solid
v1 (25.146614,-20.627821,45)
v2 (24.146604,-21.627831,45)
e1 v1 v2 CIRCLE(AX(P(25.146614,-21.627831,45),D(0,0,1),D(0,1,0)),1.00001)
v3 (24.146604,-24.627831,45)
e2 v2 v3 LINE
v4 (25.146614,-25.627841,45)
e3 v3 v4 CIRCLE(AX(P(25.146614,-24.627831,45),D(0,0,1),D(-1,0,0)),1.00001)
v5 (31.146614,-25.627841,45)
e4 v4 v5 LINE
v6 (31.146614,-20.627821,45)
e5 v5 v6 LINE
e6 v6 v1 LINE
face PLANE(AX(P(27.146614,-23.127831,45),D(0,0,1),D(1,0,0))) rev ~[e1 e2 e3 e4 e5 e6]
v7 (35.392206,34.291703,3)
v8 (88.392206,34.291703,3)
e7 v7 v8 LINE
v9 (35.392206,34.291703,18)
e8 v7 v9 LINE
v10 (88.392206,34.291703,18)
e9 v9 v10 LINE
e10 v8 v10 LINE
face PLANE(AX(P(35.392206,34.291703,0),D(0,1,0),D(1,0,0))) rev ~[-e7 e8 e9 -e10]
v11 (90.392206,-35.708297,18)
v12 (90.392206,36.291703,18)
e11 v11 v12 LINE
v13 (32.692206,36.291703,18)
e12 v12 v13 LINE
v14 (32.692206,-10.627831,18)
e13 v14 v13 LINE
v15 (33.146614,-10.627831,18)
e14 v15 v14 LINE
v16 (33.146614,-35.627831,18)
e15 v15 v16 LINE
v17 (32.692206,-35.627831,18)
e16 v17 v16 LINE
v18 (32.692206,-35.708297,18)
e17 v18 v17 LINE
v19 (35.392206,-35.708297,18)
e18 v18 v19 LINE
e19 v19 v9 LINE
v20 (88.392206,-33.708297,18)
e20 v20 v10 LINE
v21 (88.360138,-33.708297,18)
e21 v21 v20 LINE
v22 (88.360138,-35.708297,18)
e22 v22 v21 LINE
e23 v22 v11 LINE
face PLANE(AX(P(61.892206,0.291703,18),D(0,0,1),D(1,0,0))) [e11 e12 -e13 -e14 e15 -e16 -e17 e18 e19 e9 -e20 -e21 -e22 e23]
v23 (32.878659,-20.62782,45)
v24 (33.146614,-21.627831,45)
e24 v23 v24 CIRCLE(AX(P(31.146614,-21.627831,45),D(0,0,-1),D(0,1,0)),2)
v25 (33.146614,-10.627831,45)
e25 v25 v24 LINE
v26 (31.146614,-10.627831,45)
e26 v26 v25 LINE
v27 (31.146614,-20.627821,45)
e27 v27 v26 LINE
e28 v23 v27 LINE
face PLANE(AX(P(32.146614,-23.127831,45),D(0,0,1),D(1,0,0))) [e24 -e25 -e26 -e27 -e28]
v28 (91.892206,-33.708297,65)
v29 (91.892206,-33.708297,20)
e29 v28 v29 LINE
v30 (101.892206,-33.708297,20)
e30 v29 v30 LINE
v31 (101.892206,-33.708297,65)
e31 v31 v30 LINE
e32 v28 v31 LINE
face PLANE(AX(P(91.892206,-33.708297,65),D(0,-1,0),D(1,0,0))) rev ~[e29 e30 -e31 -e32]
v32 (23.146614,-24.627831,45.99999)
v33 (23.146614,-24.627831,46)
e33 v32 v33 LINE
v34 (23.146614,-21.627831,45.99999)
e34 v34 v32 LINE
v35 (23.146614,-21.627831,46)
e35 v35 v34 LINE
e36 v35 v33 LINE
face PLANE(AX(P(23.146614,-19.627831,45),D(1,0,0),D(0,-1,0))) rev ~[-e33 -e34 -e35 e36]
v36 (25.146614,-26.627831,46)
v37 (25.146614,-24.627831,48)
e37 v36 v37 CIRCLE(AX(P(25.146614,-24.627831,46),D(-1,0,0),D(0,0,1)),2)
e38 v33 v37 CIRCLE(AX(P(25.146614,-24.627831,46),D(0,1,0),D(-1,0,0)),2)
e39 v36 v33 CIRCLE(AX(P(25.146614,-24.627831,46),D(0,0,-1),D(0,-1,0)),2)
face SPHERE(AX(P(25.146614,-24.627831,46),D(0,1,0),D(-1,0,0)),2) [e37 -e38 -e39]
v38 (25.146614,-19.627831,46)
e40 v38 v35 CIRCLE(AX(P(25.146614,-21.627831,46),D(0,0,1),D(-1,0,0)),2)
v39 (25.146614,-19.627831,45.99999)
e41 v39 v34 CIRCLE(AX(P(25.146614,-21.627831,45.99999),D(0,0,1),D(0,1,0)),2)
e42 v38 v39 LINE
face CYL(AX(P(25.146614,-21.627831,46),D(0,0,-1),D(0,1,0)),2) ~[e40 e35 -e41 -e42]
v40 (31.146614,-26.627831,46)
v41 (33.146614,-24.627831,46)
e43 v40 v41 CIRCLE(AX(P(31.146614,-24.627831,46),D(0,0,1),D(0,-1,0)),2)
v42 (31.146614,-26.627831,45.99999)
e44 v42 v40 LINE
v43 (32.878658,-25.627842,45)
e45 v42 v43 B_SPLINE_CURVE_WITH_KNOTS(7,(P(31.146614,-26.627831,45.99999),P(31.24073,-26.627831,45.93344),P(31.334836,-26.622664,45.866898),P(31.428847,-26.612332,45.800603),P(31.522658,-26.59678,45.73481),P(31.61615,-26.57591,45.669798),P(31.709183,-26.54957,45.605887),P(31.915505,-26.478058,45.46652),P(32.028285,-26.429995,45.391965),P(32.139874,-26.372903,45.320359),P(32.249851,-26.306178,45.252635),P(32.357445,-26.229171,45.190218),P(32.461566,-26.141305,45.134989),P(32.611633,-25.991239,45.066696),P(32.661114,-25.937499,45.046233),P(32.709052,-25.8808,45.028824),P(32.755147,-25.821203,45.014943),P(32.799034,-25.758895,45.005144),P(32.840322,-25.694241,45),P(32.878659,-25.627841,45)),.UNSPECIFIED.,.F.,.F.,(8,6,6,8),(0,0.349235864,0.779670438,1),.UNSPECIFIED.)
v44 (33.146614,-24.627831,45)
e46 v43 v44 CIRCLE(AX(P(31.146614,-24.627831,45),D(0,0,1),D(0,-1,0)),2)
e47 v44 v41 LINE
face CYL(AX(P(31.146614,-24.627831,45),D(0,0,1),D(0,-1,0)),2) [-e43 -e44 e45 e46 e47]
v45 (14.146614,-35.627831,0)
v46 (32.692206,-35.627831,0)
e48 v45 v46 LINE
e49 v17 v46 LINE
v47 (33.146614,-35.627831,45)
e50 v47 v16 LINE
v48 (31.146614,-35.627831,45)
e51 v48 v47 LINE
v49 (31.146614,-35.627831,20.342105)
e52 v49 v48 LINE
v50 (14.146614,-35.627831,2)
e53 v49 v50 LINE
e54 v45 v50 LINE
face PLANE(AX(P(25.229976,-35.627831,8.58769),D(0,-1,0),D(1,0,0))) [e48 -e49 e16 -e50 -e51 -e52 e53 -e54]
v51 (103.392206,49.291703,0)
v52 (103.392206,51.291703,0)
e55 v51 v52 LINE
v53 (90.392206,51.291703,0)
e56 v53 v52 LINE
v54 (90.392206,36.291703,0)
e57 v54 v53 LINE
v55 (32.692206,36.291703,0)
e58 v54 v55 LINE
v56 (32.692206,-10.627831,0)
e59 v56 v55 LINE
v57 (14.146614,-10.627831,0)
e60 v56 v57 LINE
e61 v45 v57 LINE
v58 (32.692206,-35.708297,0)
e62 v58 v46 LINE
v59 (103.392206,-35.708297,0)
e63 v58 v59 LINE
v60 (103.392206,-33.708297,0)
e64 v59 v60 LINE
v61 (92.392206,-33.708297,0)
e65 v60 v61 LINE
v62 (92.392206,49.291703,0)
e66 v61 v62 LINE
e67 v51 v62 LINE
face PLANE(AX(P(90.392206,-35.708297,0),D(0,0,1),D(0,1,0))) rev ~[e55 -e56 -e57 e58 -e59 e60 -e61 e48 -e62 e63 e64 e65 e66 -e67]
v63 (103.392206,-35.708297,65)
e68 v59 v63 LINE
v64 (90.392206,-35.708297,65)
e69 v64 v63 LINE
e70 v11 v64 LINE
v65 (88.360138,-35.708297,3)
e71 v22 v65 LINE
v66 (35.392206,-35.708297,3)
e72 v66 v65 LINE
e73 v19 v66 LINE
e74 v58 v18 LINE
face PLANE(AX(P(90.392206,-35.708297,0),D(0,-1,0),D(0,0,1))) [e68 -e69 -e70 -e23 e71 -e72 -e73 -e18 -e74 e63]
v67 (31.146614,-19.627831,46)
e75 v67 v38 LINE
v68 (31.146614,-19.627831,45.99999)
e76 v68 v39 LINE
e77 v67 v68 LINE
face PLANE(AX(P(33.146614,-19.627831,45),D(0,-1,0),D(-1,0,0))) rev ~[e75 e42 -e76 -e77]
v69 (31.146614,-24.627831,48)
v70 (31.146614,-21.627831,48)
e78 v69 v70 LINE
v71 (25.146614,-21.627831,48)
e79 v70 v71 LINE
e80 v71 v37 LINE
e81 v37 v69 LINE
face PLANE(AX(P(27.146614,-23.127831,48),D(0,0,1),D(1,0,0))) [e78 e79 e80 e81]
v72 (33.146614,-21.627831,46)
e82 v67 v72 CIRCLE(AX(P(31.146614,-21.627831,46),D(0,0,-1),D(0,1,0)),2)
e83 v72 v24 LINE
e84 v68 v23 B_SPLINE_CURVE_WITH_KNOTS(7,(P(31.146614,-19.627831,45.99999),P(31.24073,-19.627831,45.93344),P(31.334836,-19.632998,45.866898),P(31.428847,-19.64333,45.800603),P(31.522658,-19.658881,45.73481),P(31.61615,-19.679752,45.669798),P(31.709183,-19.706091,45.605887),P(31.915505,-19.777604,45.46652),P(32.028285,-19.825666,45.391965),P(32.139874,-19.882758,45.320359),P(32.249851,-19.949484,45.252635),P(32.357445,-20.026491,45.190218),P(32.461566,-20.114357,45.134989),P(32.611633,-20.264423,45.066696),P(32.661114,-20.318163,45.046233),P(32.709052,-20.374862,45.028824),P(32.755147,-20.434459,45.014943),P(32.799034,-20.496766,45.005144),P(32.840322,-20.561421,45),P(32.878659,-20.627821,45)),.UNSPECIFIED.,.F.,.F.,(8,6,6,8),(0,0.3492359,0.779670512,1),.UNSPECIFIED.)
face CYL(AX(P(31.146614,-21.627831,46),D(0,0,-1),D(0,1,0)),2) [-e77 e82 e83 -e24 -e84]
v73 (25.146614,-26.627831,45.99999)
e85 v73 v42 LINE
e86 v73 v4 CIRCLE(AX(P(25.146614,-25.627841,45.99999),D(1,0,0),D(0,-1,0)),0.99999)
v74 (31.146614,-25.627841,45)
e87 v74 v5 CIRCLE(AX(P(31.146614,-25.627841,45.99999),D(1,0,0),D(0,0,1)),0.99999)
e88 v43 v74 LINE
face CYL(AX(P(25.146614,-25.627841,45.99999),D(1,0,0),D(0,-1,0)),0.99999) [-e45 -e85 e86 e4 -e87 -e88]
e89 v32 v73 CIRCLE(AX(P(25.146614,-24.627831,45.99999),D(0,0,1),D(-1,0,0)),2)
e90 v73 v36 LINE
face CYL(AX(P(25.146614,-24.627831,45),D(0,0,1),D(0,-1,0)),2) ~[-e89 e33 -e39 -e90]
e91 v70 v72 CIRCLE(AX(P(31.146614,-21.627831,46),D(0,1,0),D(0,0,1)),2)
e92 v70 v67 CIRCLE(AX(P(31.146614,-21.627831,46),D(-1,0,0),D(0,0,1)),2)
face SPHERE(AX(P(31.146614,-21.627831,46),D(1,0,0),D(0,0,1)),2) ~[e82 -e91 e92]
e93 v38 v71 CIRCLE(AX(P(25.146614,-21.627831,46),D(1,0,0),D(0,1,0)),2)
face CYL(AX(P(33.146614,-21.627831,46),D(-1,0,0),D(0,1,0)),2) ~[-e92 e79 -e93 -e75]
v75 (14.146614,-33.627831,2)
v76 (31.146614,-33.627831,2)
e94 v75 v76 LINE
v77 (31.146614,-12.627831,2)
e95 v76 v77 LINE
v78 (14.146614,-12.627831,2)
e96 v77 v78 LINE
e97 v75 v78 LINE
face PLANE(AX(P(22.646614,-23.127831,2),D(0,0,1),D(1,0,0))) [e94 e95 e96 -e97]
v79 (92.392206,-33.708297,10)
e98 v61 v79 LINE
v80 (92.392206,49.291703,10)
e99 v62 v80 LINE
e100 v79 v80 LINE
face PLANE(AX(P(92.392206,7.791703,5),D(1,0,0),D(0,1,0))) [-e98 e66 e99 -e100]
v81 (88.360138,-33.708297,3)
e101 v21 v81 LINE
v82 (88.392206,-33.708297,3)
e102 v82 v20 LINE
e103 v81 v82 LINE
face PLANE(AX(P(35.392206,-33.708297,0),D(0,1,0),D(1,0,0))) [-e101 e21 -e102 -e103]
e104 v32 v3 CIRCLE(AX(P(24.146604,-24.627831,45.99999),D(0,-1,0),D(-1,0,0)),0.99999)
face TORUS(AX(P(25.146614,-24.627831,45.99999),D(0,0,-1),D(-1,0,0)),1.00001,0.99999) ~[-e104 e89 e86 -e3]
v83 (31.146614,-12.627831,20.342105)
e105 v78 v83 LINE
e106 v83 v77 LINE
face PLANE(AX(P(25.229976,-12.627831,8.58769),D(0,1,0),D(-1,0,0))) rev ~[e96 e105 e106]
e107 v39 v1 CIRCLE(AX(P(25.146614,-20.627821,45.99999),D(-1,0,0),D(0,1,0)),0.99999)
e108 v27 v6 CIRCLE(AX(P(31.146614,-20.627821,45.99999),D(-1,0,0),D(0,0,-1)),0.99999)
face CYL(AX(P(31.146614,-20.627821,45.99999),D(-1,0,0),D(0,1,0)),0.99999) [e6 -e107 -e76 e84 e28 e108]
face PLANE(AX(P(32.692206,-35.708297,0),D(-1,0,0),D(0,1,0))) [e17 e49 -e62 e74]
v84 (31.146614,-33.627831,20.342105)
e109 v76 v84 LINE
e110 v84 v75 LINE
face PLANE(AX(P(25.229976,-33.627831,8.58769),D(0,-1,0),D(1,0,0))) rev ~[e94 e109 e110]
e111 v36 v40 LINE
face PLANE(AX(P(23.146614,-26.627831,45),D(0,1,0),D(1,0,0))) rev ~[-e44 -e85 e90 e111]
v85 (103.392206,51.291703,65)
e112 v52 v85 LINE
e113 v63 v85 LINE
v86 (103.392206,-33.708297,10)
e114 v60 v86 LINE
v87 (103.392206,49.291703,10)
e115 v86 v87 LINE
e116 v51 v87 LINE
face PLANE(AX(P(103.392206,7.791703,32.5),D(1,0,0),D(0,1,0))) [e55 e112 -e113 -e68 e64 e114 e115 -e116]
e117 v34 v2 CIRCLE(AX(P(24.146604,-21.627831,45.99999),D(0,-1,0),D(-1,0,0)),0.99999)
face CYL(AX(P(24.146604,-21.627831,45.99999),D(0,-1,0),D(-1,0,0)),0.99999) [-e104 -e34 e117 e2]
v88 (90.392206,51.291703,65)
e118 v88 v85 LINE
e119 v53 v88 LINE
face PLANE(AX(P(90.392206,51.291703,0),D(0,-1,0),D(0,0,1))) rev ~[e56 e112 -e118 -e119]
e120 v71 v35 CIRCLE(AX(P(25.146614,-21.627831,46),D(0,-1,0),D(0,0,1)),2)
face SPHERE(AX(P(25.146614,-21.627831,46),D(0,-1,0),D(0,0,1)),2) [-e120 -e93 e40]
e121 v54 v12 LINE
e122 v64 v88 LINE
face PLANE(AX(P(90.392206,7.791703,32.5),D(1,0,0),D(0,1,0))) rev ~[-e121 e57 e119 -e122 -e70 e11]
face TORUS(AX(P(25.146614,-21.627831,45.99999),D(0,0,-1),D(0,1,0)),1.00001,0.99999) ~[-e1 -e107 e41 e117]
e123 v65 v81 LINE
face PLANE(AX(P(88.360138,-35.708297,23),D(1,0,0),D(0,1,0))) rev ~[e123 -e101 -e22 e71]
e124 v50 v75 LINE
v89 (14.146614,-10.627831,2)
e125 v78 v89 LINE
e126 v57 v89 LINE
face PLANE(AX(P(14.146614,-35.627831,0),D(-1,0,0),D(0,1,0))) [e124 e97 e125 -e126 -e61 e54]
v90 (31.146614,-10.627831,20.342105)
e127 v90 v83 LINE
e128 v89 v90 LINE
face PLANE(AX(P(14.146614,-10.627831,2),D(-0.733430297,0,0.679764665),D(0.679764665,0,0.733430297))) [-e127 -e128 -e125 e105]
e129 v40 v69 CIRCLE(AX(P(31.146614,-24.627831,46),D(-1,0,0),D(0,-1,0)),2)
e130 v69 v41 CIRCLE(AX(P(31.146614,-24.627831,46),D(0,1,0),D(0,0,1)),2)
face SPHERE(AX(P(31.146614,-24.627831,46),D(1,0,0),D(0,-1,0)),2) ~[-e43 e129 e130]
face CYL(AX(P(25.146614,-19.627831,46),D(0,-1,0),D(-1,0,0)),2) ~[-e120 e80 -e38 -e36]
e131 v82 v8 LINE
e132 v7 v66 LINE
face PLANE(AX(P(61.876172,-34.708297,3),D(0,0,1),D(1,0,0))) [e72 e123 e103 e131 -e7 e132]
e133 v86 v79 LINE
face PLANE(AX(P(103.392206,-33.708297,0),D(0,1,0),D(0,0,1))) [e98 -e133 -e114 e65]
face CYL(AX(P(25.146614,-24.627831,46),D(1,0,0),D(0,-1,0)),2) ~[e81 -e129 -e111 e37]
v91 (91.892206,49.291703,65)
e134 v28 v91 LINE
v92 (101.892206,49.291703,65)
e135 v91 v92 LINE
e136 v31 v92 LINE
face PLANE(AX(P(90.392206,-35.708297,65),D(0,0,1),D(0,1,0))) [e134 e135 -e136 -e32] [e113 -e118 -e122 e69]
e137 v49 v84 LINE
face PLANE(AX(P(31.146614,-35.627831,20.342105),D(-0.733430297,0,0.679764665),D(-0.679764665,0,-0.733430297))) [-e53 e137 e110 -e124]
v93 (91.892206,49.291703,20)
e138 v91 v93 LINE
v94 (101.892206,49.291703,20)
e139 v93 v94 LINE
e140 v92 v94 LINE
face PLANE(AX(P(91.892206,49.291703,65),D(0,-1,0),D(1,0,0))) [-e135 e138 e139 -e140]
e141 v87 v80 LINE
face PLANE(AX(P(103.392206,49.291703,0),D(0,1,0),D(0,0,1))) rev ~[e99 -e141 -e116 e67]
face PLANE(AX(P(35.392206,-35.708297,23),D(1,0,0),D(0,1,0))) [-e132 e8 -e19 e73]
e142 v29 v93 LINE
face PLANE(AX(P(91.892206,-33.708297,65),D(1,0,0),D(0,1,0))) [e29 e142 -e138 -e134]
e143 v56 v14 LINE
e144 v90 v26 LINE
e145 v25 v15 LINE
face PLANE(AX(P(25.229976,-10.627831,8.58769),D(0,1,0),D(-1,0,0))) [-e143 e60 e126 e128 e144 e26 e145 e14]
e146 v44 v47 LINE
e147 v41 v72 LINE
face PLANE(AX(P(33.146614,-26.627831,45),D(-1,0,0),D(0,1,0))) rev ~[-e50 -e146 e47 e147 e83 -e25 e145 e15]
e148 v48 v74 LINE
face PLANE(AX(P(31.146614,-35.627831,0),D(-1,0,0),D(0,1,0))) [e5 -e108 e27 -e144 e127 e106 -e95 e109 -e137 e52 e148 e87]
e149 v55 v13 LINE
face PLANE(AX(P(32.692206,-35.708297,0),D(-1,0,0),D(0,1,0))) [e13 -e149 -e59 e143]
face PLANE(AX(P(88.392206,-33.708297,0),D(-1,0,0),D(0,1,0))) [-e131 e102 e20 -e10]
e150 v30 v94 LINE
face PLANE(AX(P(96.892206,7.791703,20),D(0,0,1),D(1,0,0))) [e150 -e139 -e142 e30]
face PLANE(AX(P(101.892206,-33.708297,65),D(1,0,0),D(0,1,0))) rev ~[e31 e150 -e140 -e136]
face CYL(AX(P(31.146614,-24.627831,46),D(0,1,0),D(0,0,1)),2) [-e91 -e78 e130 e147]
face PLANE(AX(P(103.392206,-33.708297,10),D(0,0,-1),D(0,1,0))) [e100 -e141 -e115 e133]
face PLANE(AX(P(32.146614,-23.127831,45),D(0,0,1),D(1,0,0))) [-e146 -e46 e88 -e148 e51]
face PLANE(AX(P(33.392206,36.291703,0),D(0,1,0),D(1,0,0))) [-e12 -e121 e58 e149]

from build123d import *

# Parameters (mm, degrees)
F0_W      = 17
F0_H      = 25
F1_DEPTH  = 2
F0_W_2    = 2
F2_DEPTH  = 45
F3_W      = 2
F3_H      = 7
F4_DEPTH  = 3
F5_R      = 2
F6_R      = 2
F7_R      = 2
F8_R      = 2
F9_R      = 0.99999
F12_DEPTH = 2
F13_DEPTH = 2
F14_W     = 53
F14_H     = 68
F15_DEPTH = 3
F14_W_2   = 57
F14_H_2   = 72
F16_DEPTH = 23
F17_W     = 52.9679324031
F17_H     = 2
F18_DEPTH = 20
F19_DEPTH = 0.7
F21_DEPTH = 5
F22_W     = 87
F22_H     = 65
F23_DEPTH = 13
F25_W     = 83
F25_H     = 10
F26_DEPTH = 11
F24_W     = 10
F24_H     = 83
F27_DEPTH = 45
F28_DEPTH = 45
F29_DEPTH = 45


# Not quite as in the source:
# - a fillet or chamfer is up to 0.001 mm smaller than in the source, because OpenCascade refuses the exact size


with BuildPart() as f1:
    # F0 (on Top) → F1 (new body)
    with BuildSketch(Plane.XY):
        with Locations((22.646613881, -23.1278307736)):
            Rectangle(F0_W, F0_H)
    extrude(amount=F1_DEPTH)

    # F0 (on Top) → F2 (join)
    with BuildSketch(Plane.XY):
        with Locations((32.146613881, -23.1278307736)):
            Rectangle(F0_W_2, F0_H)
    extrude(amount=F2_DEPTH)

    # F3 (on face) → F4 (join)
    with BuildSketch(Plane.XY.offset(45)):
        Polygon((29.146613881, -26.6278307736), (31.146613881, -26.6278307736), (31.146613881, -19.6278307736), (23.146613881, -19.6278307736), (23.146613881, -25.5845747888), (23.146613881, -26.6278307736), align=None)
        with Locations((32.146613881, -23.1278307736)):
            Rectangle(F3_W, F3_H)
    extrude(amount=F4_DEPTH)

    # F5
    f5_edges = [f1.edges().sort_by_distance(p)[0] for p in [
        (23.146614, -23.127831, 48),
    ]]
    fillet(f5_edges, radius=F5_R)

    # F6
    f6_edges = [f1.edges().sort_by_distance(p)[0] for p in [
        (29.146614, -26.627831, 48),
    ]]
    fillet(f6_edges, radius=F6_R)

    # F7
    f7_edges = [f1.edges().sort_by_distance(p)[0] for p in [
        (29.146614, -19.627831, 48),
    ]]
    fillet(f7_edges, radius=F7_R)

    # F8
    f8_edges = [f1.edges().sort_by_distance(p)[0] for p in [
        (33.146614, -23.127831, 48),
    ]]
    fillet(f8_edges, radius=F8_R)

    # F9 (radius 1 in the source; OpenCascade refuses exactly that, so slightly less here)
    f9_edges = [f1.edges().sort_by_distance(p)[0] for p in [
        (23.146614, -23.127831, 45),
    ]]
    fillet(f9_edges, radius=F9_R)

    # F11 (on face) → F12 (join)
    with BuildSketch(Plane.XZ.offset(35.6278307736)):
        Polygon((31.146613881, 2), (31.146613881, 20.3421052632), (14.146613881, 2), align=None)
    extrude(amount=-F12_DEPTH)

    # F10 (on face) → F13 (join)
    with BuildSketch(Plane(origin=(0, -10.6278307736, 0), x_dir=(-1, 0, 0), z_dir=(0, 1, 0))):
        Polygon((-14.146613881, 2), (-31.146613881, 20.3421052632), (-31.146613881, 2), align=None)
    extrude(amount=-F13_DEPTH)


with BuildPart() as f15:
    # F14 (on Top) → F15 (new body)
    with BuildSketch(Plane.XY):
        with Locations((61.8922058344, 0.291702956)):
            Rectangle(F14_W, F14_H)
    extrude(amount=F15_DEPTH)

    # F14 (on Top) → F16 (join)
    with BuildSketch(Plane.XY):
        with Locations((61.8922058344, 0.291702956)):
            Rectangle(F14_W_2, F14_H_2)
        with Locations((61.8922058344, 0.291702956)):
            Rectangle(F14_W, F14_H, mode=Mode.SUBTRACT)
    extrude(amount=F16_DEPTH)

    # F17 (on face) → F18 (cut)
    with BuildSketch(Plane.XY.offset(23)):
        with Locations((61.8761720359, -34.708297044)):
            Rectangle(F17_W, F17_H)
    extrude(amount=-F18_DEPTH, mode=Mode.SUBTRACT)


with BuildPart() as f19:
    # F19 (new): a face of the model
    f19_faces = [f15.part.faces().sort_by_distance(p)[0] for p in [
        (33.3922058344, 0.291702956, 11.5),
    ]]
    extrude(f19_faces, amount=F19_DEPTH)


with BuildPart() as f1_1:
    add(f1.part)

    # F20: union F19, F15
    add(f19.part)
    add(f15.part)

    # F21 (cut): a face of the model
    f21_faces = [f1_1.faces().sort_by_distance(p)[0] for p in [
        (61.5422058344, 35.3690280403, 23),
    ]]
    extrude(f21_faces, amount=-F21_DEPTH, mode=Mode.SUBTRACT)

    # F22 (on face) → F23 (join)
    with BuildSketch(Plane.YZ.offset(90.3922058344)):
        with Locations((7.791702956, 32.5)):
            Rectangle(F22_W, F22_H)
    extrude(amount=F23_DEPTH)

    # F25 (on face) → F26 (cut)
    with BuildSketch(Plane.YZ.offset(103.3922058344)):
        with Locations((7.791702956, 5)):
            Rectangle(F25_W, F25_H)
    extrude(amount=-F26_DEPTH, mode=Mode.SUBTRACT)

    # F24 (on face) → F27 (join)
    with BuildSketch(Plane.XY.offset(65)):
        with Locations((96.8922058344, 7.791702956)):
            Rectangle(F24_W, F24_H)
    extrude(amount=-F27_DEPTH)

    # F24 (on face) → F28 (join)
    with BuildSketch(Plane.XY.offset(65)):
        with Locations((96.8922058344, 7.791702956)):
            Rectangle(F24_W, F24_H)
    extrude(amount=-F28_DEPTH)

    # F24 (on face) → F29 (cut)
    with BuildSketch(Plane.XY.offset(65)):
        with Locations((96.8922058344, 7.791702956)):
            Rectangle(F24_W, F24_H)
    extrude(amount=-F29_DEPTH, mode=Mode.SUBTRACT)


solid = f1_1.part
